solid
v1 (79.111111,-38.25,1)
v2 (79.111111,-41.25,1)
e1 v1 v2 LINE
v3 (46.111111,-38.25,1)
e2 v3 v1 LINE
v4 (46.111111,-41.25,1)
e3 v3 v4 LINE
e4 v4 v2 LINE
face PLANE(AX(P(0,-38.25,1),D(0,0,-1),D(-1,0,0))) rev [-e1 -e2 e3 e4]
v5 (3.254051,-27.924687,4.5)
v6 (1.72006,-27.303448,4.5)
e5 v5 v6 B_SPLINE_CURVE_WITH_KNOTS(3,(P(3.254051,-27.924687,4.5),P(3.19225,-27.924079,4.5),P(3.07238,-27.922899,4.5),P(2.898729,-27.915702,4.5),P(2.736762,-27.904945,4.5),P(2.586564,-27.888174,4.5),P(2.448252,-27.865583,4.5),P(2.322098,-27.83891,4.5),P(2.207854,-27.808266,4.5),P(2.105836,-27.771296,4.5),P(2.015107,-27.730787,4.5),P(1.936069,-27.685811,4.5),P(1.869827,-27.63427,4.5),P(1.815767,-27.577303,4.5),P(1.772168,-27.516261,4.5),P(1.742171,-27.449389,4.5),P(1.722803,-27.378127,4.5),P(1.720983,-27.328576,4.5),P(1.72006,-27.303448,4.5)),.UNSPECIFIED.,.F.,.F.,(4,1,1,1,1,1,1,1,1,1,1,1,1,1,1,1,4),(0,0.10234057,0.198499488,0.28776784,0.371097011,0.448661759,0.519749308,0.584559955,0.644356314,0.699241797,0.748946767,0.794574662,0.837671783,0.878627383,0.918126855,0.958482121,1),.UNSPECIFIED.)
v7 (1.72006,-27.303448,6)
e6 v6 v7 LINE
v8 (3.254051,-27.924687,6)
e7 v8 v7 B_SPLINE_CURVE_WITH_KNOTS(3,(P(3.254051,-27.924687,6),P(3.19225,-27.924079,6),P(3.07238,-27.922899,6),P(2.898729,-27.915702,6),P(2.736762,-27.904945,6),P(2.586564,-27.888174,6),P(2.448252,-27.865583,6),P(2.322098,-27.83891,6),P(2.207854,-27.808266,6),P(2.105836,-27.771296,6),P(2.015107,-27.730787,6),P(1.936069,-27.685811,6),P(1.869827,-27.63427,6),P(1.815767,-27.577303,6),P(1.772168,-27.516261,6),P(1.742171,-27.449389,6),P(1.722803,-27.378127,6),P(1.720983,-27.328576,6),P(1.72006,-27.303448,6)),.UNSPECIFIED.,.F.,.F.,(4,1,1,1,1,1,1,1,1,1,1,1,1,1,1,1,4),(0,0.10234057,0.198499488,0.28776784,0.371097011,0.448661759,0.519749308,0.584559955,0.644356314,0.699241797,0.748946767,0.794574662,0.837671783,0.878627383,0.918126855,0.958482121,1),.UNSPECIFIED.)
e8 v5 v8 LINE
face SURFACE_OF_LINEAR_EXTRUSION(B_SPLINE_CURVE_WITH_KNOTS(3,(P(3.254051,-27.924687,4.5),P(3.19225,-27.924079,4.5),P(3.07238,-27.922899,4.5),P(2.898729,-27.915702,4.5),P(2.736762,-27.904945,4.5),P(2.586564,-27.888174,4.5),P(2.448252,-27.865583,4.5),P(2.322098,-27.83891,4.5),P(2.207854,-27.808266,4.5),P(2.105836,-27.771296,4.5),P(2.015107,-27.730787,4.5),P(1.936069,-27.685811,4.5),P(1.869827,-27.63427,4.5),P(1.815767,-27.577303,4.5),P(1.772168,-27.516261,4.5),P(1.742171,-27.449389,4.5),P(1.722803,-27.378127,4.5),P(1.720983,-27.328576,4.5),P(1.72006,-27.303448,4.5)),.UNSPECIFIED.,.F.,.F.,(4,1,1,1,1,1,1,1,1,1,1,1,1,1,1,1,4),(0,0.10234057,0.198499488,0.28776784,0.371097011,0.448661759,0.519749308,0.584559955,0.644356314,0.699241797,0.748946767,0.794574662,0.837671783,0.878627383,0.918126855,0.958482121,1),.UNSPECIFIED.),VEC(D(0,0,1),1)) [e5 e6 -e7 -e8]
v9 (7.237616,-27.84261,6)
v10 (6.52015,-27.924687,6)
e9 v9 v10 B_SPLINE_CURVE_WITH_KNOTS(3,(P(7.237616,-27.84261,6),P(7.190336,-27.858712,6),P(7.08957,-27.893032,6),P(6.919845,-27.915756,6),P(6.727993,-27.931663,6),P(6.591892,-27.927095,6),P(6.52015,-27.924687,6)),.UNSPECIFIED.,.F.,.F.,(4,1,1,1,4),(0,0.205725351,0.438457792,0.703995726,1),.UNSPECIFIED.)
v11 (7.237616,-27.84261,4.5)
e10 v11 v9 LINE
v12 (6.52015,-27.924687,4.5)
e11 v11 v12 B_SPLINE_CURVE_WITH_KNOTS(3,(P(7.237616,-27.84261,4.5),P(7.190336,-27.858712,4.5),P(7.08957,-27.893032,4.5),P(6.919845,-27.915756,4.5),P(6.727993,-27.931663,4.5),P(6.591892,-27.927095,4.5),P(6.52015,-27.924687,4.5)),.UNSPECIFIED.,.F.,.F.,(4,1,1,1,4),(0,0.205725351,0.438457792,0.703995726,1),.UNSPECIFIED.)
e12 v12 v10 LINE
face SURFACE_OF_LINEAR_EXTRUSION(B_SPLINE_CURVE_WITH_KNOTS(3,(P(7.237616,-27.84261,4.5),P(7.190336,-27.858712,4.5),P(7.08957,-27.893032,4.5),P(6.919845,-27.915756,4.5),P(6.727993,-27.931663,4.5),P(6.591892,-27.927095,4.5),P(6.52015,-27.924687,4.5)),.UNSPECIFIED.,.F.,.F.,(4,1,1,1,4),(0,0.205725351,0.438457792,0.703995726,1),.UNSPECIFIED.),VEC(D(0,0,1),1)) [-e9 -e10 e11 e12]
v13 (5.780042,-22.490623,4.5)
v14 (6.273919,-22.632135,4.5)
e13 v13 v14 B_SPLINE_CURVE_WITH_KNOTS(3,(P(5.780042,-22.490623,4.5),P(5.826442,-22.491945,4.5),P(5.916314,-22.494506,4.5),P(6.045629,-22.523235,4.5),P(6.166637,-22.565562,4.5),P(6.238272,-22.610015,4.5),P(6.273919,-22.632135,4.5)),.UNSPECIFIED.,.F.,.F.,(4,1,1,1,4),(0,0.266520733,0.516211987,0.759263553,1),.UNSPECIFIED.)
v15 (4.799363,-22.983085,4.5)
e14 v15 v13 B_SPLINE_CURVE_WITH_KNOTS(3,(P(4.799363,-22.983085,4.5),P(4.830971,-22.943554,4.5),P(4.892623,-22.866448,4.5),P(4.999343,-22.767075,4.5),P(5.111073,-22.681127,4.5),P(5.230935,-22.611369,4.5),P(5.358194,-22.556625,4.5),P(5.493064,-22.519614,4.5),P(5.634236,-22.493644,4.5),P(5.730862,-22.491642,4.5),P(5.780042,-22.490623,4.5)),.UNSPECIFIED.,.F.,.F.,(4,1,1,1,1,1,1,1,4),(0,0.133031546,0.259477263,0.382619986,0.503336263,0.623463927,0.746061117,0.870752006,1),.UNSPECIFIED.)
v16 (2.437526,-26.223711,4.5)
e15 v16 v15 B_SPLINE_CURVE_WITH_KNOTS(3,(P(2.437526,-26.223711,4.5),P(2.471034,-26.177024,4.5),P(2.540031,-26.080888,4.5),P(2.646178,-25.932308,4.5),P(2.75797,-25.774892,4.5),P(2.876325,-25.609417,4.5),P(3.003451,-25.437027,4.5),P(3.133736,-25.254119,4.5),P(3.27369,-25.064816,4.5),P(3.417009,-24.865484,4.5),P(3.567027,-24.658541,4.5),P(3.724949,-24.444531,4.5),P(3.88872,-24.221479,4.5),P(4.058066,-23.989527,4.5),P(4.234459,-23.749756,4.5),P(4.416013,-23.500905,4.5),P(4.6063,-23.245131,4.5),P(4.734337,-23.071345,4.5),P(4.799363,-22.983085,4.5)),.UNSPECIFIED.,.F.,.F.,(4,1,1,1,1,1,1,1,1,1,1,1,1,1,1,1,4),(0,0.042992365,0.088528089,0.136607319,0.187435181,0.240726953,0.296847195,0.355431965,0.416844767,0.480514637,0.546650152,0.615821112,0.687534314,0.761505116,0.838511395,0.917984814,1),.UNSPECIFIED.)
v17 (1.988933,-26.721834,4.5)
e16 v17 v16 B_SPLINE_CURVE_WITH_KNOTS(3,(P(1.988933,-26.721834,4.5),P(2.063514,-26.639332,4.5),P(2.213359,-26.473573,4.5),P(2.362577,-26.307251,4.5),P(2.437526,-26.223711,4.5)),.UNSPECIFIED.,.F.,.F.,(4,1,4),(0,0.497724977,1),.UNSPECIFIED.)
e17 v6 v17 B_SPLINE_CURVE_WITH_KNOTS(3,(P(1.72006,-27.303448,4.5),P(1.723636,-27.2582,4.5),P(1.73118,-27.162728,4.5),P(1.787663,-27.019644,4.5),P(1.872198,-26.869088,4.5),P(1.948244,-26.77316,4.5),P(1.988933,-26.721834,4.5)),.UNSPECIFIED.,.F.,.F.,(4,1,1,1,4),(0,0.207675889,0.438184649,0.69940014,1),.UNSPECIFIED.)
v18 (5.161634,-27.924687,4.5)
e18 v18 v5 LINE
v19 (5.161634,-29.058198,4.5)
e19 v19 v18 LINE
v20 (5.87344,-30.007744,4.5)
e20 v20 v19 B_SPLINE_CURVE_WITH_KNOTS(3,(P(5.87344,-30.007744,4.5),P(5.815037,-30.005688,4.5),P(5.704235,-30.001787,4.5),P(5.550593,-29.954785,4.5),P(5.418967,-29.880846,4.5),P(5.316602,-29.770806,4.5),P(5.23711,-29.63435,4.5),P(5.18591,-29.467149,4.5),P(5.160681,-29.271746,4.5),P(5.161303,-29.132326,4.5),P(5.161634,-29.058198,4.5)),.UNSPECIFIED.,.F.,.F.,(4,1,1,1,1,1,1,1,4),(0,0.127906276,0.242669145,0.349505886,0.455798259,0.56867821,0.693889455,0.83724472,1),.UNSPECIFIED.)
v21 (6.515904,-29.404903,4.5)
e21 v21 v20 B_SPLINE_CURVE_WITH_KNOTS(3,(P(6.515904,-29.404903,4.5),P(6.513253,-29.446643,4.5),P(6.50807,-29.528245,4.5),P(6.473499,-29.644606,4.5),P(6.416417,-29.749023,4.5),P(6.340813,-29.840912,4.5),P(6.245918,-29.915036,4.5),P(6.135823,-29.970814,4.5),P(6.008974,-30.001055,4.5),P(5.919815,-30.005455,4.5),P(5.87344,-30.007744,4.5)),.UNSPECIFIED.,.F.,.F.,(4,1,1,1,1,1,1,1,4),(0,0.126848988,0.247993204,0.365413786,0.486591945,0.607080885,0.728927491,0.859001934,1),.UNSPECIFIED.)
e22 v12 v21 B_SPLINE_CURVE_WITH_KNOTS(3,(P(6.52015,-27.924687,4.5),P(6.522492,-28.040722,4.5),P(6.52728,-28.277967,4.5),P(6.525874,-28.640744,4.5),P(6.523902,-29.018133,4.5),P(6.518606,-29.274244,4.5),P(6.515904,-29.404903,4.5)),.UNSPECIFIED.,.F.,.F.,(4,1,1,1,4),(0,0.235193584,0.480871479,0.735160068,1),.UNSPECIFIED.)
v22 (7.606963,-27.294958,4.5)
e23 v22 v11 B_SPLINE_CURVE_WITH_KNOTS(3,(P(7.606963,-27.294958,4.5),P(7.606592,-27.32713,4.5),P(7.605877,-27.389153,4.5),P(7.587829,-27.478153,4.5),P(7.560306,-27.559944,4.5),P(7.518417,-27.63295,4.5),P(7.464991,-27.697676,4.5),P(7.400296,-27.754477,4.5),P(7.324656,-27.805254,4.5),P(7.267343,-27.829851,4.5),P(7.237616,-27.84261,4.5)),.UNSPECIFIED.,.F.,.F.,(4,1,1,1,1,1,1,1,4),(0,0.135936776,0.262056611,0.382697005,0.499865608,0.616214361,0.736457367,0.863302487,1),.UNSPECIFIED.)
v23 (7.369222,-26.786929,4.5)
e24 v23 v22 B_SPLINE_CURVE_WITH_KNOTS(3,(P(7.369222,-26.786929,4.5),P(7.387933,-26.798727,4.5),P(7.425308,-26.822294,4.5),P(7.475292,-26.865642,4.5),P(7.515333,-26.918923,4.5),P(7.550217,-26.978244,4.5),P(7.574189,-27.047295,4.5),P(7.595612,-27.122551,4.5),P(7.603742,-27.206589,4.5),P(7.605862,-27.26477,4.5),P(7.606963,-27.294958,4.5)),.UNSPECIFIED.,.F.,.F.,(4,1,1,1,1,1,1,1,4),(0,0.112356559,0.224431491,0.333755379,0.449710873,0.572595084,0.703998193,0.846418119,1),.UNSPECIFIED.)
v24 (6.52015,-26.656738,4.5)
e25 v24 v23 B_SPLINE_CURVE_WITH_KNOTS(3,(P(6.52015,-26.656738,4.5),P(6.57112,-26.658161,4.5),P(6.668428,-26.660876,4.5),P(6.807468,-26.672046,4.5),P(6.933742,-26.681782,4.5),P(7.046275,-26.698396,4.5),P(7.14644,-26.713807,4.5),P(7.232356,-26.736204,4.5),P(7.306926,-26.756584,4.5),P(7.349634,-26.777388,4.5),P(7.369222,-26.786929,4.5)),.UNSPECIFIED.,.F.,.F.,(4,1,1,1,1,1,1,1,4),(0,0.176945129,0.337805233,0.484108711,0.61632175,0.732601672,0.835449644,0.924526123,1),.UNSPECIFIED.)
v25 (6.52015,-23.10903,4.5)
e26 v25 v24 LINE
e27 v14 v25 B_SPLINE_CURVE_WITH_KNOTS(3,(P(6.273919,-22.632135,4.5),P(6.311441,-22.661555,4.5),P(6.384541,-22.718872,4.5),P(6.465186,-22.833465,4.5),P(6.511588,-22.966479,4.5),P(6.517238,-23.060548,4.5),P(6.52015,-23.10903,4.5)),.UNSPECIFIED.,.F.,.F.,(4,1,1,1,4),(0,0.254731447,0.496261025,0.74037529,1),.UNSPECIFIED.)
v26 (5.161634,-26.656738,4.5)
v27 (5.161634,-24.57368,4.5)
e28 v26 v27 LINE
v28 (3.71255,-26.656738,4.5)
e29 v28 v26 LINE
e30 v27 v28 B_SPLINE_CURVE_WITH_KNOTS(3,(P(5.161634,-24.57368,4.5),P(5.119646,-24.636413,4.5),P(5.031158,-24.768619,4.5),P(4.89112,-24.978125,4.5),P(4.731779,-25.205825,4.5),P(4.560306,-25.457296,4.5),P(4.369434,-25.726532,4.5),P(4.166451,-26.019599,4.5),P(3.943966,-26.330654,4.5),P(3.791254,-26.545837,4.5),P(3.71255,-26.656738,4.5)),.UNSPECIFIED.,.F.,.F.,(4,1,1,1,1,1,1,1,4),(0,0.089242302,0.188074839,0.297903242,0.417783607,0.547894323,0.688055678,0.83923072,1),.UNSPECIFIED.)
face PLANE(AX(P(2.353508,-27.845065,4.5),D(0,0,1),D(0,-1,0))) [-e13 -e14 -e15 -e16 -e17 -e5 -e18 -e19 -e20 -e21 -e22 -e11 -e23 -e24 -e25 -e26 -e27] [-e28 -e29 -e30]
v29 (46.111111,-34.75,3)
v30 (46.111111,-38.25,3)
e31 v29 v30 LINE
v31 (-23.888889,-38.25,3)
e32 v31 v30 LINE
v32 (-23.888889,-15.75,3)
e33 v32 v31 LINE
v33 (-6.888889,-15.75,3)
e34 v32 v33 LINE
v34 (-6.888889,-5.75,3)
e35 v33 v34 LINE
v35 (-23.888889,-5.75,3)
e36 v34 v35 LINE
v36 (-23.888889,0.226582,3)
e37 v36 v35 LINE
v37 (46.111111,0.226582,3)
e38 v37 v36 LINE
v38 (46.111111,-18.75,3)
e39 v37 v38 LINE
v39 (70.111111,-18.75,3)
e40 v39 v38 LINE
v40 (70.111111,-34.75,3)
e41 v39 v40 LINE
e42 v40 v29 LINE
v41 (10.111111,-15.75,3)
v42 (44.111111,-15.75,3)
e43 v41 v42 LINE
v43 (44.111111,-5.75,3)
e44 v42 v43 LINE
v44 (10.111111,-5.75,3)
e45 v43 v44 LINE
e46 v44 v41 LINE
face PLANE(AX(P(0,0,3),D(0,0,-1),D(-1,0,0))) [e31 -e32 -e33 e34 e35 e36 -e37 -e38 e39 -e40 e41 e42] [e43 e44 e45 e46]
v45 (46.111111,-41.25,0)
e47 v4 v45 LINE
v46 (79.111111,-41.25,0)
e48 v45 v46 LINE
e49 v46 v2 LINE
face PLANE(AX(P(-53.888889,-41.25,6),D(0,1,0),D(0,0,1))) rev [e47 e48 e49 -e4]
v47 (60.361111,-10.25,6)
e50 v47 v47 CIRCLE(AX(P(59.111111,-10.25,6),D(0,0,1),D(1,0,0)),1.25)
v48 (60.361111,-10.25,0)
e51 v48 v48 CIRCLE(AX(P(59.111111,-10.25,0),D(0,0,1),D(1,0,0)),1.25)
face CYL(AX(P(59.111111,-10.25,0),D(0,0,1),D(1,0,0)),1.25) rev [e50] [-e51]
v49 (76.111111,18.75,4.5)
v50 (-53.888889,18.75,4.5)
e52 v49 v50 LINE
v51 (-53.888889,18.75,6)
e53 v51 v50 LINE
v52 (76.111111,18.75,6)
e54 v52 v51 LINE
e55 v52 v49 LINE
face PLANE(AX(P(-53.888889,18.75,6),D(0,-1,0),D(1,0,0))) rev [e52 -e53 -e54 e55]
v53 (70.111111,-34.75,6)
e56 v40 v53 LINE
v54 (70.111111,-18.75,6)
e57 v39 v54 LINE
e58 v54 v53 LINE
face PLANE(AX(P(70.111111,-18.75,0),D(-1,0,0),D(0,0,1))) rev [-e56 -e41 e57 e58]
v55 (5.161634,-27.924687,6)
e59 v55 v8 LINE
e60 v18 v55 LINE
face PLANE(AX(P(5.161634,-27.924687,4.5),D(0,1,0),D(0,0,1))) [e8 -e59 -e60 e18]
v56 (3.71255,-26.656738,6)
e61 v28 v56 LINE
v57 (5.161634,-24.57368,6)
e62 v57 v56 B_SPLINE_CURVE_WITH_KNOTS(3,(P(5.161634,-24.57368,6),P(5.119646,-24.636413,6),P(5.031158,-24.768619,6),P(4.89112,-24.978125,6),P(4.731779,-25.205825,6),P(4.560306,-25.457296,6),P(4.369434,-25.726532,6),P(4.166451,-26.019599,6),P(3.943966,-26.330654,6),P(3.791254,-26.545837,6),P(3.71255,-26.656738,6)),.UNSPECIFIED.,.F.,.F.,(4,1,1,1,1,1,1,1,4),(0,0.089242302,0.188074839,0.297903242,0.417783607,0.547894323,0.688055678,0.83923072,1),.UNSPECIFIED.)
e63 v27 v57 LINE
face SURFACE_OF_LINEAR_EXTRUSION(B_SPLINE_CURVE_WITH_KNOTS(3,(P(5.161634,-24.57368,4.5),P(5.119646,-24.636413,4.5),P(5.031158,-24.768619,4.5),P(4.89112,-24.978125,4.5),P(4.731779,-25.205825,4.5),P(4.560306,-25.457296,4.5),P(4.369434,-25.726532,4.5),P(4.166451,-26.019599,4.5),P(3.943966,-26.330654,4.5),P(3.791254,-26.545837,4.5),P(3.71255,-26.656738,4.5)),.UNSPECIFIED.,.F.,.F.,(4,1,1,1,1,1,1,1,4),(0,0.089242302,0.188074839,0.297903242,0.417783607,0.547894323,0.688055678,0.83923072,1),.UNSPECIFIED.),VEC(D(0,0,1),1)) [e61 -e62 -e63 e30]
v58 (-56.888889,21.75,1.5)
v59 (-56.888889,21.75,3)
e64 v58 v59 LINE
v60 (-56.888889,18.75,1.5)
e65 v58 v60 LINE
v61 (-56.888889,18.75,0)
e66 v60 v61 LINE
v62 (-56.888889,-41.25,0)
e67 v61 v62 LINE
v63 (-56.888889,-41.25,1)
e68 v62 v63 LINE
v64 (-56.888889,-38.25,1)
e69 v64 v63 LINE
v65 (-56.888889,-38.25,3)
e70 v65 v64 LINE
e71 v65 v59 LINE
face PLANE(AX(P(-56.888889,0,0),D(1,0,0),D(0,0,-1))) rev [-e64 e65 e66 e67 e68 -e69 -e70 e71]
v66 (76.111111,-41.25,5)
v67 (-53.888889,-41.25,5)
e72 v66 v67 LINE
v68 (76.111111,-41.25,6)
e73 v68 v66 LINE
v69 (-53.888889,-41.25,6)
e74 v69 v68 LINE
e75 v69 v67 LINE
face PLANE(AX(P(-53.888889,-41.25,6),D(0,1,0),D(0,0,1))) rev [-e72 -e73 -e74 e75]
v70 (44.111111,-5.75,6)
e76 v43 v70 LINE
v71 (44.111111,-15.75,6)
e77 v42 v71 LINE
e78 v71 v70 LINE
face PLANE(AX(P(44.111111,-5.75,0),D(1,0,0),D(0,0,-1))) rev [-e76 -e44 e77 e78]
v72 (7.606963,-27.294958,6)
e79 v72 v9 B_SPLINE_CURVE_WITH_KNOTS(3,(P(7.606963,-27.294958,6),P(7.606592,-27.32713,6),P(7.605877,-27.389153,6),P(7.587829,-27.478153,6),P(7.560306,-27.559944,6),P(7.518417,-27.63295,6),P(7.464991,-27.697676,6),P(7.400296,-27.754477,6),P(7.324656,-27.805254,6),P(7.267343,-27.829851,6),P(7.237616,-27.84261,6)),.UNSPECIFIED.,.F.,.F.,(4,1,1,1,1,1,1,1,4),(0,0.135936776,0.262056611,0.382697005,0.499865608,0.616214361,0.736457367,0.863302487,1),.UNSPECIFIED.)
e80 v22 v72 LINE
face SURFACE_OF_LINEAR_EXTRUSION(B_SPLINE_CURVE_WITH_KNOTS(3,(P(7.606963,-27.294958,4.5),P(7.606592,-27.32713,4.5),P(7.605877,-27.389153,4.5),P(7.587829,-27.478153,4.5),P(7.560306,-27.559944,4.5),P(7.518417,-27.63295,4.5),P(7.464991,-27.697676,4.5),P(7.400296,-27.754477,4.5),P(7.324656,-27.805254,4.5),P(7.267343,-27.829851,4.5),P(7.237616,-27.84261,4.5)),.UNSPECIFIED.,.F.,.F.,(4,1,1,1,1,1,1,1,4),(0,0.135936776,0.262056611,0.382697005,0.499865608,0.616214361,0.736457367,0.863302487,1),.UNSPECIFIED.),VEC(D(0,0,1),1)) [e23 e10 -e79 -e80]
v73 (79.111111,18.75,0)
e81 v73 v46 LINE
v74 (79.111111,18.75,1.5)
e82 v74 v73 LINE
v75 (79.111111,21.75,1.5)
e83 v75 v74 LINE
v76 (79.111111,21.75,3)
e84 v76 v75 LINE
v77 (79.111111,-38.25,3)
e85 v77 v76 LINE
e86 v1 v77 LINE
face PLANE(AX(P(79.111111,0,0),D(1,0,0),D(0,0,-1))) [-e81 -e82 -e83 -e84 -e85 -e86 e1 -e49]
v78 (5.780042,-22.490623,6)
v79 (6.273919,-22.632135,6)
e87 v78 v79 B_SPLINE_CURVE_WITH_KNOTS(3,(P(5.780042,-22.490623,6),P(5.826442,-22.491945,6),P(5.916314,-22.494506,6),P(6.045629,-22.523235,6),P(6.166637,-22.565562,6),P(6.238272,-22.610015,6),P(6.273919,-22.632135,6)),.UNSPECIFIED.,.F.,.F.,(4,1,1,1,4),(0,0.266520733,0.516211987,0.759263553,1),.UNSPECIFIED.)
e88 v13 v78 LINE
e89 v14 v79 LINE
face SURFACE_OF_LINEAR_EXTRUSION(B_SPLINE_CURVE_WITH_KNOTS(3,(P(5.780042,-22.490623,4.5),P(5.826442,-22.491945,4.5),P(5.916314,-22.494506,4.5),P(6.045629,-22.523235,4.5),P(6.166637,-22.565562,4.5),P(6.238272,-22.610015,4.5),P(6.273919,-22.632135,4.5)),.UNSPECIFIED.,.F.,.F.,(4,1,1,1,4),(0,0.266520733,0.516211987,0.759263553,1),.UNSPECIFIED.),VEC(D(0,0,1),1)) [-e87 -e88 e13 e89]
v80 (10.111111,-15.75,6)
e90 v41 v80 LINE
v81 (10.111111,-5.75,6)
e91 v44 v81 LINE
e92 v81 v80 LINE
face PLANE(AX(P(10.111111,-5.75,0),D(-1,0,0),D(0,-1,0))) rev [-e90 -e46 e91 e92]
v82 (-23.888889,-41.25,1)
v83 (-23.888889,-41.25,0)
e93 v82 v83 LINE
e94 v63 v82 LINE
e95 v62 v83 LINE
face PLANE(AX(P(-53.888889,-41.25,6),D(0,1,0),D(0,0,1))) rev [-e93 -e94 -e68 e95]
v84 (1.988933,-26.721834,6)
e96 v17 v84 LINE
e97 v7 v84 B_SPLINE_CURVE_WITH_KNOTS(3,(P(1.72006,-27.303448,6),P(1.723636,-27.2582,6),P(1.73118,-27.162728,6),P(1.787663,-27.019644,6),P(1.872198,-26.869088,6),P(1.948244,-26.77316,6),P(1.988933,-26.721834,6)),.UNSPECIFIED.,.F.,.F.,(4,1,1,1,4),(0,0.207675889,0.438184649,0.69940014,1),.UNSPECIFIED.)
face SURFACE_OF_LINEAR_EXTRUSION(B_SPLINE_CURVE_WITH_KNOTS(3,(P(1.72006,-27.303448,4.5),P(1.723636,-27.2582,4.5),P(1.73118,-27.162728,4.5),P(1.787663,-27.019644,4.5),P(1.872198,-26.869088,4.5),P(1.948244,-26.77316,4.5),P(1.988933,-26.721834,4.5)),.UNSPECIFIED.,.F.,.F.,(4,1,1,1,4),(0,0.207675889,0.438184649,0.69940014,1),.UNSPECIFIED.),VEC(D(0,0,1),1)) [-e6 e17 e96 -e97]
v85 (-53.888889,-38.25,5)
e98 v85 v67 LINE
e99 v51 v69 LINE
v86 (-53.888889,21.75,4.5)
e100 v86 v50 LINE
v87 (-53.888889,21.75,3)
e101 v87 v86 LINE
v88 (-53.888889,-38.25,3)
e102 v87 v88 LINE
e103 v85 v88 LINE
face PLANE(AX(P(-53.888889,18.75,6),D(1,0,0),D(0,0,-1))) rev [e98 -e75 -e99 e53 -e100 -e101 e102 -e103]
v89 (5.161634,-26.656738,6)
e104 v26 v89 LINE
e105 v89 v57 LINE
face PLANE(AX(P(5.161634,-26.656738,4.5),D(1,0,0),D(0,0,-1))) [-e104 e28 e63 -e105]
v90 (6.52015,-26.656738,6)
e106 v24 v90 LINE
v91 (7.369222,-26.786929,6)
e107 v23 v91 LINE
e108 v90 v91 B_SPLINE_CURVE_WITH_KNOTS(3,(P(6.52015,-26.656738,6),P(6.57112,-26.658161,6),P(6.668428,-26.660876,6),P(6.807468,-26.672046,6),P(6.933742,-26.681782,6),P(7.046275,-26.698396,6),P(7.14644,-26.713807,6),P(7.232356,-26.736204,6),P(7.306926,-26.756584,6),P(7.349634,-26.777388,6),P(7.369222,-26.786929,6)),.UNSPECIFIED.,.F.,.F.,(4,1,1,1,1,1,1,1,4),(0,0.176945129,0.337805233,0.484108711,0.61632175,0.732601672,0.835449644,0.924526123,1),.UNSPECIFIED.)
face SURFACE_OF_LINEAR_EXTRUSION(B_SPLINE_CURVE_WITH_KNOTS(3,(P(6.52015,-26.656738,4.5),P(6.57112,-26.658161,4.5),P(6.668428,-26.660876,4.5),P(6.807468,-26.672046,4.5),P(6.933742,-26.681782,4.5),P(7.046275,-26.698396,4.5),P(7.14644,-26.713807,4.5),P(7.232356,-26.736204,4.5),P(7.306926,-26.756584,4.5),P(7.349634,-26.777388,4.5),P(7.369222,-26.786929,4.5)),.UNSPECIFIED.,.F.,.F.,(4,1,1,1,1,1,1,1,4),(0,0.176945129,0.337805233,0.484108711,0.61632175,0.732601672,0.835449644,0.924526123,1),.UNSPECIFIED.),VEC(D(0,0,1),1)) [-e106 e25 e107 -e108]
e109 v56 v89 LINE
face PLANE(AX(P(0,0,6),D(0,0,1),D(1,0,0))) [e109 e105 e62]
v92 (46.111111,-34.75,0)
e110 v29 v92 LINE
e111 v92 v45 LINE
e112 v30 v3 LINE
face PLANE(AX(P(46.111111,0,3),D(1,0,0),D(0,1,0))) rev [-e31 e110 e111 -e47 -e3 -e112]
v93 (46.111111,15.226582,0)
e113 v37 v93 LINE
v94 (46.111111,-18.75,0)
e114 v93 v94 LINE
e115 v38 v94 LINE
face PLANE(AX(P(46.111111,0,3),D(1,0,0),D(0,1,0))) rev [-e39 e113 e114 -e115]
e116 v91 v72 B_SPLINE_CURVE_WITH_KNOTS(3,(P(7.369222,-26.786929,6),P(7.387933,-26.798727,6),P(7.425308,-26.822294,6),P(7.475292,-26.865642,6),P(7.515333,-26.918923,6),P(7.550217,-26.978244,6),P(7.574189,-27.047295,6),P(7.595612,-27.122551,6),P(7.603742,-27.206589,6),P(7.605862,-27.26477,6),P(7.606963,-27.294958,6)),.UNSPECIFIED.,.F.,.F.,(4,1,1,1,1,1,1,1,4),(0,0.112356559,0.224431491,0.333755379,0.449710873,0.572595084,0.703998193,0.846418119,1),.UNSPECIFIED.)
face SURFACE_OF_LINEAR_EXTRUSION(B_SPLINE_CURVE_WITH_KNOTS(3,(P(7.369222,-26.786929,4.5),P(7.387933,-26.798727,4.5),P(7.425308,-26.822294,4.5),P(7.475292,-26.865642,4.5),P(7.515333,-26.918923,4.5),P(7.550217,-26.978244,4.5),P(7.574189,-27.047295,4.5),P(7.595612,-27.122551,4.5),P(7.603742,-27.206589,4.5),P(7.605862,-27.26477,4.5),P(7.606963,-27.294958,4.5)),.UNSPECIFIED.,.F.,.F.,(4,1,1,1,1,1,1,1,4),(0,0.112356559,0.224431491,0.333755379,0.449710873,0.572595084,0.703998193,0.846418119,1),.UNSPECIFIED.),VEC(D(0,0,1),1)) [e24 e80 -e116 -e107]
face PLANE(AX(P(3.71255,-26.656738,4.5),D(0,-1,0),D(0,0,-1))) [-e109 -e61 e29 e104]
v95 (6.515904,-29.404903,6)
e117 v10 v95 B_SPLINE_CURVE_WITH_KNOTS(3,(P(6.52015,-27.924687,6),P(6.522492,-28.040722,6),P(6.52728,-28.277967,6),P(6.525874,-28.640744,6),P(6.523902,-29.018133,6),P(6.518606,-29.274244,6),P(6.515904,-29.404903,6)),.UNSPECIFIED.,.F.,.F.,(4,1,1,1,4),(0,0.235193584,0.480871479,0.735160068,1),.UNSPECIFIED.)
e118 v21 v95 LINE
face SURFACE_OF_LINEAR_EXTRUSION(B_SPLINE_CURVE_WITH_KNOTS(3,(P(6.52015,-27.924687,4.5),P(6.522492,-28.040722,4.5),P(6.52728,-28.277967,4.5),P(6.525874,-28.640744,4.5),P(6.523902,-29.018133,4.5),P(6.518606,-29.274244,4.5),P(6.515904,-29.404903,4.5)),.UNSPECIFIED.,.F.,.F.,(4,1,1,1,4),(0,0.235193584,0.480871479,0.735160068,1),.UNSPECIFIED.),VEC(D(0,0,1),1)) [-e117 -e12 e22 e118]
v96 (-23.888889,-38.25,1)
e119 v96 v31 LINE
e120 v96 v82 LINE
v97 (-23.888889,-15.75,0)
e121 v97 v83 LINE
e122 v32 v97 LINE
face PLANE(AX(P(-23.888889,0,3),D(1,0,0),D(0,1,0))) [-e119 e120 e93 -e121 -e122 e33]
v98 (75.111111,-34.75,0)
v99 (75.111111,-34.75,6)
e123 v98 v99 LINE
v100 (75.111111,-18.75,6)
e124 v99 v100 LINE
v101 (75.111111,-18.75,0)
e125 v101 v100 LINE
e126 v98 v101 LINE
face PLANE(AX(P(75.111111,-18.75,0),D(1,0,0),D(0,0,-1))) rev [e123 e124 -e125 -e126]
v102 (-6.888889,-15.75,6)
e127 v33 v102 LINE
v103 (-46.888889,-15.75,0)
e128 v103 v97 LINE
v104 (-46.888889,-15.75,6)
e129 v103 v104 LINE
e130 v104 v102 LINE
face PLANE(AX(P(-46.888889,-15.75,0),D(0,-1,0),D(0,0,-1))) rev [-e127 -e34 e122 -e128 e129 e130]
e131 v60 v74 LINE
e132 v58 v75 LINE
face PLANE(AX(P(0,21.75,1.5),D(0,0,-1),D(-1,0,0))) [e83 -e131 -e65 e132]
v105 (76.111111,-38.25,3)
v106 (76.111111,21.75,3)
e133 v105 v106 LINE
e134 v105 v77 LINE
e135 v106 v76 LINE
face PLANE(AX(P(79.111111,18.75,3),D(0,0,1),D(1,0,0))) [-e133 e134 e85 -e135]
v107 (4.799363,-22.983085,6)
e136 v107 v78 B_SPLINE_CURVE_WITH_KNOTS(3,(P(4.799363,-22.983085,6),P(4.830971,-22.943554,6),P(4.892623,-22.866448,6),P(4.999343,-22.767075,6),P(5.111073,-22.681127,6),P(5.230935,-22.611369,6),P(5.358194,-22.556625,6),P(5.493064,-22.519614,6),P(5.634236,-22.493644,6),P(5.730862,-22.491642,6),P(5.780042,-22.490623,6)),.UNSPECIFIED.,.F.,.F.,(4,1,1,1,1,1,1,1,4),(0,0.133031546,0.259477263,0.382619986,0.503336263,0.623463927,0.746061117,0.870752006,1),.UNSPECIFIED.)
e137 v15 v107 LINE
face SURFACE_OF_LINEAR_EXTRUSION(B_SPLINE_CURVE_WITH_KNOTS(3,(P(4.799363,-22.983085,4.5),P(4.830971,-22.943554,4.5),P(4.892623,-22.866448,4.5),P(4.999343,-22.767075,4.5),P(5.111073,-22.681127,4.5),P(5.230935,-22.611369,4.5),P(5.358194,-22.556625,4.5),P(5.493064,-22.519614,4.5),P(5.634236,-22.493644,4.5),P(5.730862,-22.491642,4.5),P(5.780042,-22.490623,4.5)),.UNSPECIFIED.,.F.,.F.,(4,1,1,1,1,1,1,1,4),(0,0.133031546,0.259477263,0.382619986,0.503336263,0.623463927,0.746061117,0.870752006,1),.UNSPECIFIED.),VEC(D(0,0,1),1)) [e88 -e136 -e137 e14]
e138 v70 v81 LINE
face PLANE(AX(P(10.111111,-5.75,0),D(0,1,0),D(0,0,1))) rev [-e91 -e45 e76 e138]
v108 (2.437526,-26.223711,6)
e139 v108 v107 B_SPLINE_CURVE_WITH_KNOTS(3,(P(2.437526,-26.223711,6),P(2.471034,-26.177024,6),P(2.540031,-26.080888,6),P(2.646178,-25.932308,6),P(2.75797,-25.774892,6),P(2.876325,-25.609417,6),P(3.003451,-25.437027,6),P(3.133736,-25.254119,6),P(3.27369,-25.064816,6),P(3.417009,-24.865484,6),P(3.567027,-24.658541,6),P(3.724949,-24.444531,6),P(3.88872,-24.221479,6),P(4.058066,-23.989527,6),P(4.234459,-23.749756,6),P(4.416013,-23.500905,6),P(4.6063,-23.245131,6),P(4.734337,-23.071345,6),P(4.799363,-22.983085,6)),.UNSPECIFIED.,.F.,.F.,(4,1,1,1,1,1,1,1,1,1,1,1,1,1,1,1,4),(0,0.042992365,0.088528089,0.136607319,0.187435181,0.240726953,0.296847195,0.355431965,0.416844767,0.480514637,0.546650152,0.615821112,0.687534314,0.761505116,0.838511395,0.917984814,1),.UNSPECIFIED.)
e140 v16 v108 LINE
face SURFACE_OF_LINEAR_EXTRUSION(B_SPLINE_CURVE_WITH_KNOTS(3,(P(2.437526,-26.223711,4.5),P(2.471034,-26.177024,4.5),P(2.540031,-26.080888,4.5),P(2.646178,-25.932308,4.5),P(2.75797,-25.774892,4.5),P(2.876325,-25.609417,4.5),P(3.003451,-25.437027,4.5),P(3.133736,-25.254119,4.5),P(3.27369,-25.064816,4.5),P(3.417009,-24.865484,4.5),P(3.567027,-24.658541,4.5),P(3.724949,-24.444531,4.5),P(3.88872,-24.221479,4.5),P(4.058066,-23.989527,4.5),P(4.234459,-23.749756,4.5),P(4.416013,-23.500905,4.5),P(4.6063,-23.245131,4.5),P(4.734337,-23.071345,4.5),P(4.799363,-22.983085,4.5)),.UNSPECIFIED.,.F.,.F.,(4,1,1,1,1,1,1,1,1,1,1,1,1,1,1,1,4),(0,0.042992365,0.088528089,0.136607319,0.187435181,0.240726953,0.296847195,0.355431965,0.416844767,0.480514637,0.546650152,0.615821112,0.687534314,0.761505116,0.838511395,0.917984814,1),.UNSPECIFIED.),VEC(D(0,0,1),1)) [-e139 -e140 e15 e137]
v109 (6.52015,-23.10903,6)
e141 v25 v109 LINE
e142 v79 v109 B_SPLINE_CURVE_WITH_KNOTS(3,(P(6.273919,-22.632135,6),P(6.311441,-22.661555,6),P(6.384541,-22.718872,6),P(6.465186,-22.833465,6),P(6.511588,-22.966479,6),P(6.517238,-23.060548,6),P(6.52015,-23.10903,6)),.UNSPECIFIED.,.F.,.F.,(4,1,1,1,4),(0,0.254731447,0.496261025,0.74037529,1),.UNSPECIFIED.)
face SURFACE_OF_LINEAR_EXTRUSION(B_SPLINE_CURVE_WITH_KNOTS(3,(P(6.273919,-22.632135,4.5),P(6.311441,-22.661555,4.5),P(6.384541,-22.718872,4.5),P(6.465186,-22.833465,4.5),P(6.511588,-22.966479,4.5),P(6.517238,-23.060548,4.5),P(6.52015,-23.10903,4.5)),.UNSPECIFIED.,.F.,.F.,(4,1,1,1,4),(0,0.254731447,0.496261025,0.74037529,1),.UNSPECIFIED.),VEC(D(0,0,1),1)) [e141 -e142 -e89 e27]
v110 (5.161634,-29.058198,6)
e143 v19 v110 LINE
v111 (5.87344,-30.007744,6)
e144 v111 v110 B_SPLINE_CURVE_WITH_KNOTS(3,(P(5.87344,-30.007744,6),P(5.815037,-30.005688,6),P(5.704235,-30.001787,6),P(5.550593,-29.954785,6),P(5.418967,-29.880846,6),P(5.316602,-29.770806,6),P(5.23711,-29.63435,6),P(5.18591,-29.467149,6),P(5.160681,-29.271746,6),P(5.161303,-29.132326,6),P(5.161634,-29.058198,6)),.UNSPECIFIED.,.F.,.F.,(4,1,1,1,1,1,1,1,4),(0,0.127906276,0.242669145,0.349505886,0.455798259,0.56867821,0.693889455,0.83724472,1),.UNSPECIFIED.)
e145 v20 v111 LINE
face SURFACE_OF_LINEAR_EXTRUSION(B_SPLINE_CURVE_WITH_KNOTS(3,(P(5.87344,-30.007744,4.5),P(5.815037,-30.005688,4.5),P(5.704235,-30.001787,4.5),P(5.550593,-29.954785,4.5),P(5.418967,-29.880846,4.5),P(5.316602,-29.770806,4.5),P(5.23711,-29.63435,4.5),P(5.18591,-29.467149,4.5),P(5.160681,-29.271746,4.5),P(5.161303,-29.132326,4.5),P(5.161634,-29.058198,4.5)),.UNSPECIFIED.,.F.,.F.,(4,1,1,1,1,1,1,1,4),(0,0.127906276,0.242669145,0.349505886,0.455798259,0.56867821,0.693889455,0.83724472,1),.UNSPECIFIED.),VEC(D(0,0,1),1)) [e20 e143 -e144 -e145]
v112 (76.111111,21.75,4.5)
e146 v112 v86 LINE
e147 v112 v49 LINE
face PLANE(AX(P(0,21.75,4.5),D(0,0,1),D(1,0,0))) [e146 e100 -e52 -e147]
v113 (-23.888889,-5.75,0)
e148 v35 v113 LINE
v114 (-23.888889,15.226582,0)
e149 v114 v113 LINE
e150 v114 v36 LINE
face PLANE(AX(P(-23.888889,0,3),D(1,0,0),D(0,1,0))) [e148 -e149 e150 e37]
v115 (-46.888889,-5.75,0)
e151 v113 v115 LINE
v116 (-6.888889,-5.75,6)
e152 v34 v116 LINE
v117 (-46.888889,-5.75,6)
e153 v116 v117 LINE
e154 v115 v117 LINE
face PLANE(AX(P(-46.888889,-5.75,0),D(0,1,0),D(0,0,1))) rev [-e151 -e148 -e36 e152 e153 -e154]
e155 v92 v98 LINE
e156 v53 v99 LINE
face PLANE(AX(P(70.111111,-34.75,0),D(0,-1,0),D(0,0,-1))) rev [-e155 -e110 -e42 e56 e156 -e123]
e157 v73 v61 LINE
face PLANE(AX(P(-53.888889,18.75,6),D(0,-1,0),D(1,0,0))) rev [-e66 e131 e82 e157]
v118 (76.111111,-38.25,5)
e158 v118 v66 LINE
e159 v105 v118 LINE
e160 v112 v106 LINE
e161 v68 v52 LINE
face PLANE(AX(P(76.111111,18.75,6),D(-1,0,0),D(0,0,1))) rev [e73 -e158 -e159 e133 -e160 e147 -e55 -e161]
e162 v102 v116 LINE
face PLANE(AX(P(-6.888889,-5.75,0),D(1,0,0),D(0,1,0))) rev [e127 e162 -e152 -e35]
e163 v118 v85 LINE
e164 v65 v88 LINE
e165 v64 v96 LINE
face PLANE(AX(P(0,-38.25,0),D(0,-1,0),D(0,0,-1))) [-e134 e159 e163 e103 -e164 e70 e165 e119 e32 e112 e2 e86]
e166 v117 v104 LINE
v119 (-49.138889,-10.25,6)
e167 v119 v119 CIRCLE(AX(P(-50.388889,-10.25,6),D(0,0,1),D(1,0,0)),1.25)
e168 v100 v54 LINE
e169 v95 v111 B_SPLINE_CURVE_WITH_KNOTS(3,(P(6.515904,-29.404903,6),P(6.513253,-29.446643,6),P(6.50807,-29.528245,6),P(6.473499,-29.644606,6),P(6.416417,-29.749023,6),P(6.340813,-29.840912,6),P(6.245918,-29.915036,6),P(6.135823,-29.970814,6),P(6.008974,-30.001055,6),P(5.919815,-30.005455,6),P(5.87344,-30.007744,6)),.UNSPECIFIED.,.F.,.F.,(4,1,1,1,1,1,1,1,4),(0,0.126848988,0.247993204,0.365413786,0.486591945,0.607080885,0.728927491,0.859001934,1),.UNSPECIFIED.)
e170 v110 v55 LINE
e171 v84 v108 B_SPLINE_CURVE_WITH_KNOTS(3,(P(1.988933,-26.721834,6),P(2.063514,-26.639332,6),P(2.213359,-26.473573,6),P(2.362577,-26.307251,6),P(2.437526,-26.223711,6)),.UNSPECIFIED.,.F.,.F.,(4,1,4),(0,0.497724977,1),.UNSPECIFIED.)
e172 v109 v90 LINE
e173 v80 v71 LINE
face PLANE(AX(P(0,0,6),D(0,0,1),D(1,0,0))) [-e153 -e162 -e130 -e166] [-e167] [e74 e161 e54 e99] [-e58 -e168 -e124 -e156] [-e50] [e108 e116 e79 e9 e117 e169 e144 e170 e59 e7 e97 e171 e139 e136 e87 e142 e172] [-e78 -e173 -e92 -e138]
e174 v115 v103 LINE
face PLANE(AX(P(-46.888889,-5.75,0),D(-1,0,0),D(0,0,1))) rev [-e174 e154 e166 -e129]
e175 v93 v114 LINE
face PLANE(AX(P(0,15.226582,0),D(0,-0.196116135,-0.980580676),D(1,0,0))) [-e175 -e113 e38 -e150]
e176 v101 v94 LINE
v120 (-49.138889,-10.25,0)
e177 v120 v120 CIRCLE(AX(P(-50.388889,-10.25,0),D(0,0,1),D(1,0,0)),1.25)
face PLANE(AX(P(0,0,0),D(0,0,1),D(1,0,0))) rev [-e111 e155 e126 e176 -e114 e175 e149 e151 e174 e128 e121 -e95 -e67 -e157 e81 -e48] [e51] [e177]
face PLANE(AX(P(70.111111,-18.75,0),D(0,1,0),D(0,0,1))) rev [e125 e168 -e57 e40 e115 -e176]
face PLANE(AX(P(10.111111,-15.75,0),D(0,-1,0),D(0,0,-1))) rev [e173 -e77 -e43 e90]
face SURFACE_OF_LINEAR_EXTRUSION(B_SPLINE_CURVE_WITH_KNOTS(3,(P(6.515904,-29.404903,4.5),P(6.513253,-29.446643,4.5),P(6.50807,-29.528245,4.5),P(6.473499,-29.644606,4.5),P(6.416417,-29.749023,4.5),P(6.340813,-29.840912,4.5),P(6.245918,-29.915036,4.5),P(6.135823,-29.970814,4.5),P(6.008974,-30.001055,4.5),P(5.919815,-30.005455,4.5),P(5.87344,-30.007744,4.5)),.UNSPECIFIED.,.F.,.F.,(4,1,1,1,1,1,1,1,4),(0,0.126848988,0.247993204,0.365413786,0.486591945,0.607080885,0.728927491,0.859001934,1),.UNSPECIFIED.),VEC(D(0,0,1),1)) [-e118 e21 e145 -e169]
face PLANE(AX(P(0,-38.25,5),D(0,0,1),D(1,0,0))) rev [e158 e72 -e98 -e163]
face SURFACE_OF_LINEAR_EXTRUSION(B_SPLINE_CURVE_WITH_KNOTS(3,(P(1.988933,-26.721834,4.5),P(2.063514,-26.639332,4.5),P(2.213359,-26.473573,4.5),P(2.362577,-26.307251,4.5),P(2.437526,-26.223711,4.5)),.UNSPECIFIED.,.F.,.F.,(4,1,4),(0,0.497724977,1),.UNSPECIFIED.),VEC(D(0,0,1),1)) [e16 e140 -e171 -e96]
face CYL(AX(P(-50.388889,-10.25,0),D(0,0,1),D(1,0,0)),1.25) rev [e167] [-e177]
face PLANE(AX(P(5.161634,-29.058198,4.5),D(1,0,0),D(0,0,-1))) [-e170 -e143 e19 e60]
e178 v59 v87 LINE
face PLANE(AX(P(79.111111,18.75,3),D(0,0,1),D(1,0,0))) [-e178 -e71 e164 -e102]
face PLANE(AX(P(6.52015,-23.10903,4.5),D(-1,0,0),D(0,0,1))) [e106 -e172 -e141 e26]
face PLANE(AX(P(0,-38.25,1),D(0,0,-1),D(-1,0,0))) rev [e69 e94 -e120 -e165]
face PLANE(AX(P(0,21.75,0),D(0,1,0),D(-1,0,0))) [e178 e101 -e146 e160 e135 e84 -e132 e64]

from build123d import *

# Parameters (mm, degrees)
SKETCH_1_W           = 130
SKETCH_1_H           = 60
EXTRUDE_1_DEPTH      = 6
EXTRUDE_2_DEPTH      = 3
EXTRUDE_2_DEPTH_BACK = 133
SKETCH_2_W           = 3
SKETCH_2_H           = 60
SKETCH_3_R           = 1.25
SKETCH_3_W           = 5
SKETCH_3_H           = 16
SKETCH_3_W_2         = 40
SKETCH_3_H_2         = 10
SKETCH_3_W_3         = 34
CUT_EXTRUDE_1_DEPTH  = 6
CUT_EXTRUDE_2_DEPTH  = 1.5
SKETCH_5_W           = 70
SKETCH_5_H           = 41.476582403
SKETCH_5_W_2         = 24
SKETCH_5_H_2         = 16
CUT_EXTRUDE_3_DEPTH  = 3
CHAMFER_1_SIZE       = 15
CHAMFER_1_SIZE_2     = 3
CUT_EXTRUDE_4_DEPTH  = 3
SKETCH_7_W           = 130
SKETCH_7_H           = 1.5
EXTRUDE_3_DEPTH      = 3


with BuildPart() as part:
    # 草圖1 → 填料-伸長1 (new body)
    with BuildSketch(Plane.XY):
        with Locations((11.111111111, -11.25)):
            Rectangle(SKETCH_1_W, SKETCH_1_H)
    extrude(amount=EXTRUDE_1_DEPTH)

    # 草圖2 → 填料-伸長2 (add, two sides: drawn at the far end of the back side and taken through both)
    with BuildSketch(Plane.ZY.offset(53.888888889).offset(-EXTRUDE_2_DEPTH_BACK)):
        with Locations((1.5, -11.25)):
            Rectangle(SKETCH_2_W, SKETCH_2_H)
    extrude(amount=EXTRUDE_2_DEPTH + EXTRUDE_2_DEPTH_BACK)

    # 草圖3 → 除料-伸長1 (cut)
    with BuildSketch(Plane.XY.offset(6)):
        with Locations((59.111111111, -10.25)):
            Circle(SKETCH_3_R)
        with Locations((-50.388888889, -10.25)):
            Circle(SKETCH_3_R)
        with Locations((72.611111111, -26.75)):
            Rectangle(SKETCH_3_W, SKETCH_3_H)
        with Locations((-26.888888889, -10.75)):
            Rectangle(SKETCH_3_W_2, SKETCH_3_H_2)
        with Locations((27.111111111, -10.75)):
            Rectangle(SKETCH_3_W_3, SKETCH_3_H_2)
    extrude(amount=-CUT_EXTRUDE_1_DEPTH, mode=Mode.SUBTRACT)

    # 草圖4 → 除料-伸長2 (cut)
    with BuildSketch(Plane.XY.offset(6)):
        with BuildLine():
            Line((5.161633763, -27.924686511), (3.254050898, -27.924686511))
            add(Edge.make_bspline(
                [(3.254050898, -27.924686511), (3.192249579, -27.924078509), (3.072379909, -27.922899232), (2.898729115, -27.915701709), (2.736761533, -27.904944526), (2.586564336, -27.888174414), (2.448251756, -27.865582926), (2.322097886, -27.838909636), (2.207853822, -27.808266207), (2.105836262, -27.771295953), (2.01510686, -27.730787239), (1.936069122, -27.68581143), (1.86982721, -27.634270004), (1.815766676, -27.57730265), (1.772168095, -27.516260775), (1.742170993, -27.449388735), (1.72280295, -27.378127045), (1.720982885, -27.328575874), (1.72005993, -27.303448471)],
                knots=[0, 0, 0, 0, 1.637449122, 3.175991815, 4.604285445, 5.937552174, 7.178588142, 8.315988927, 9.352959284, 10.309701018, 11.187868748, 11.983148269, 12.713194599, 13.402748524, 14.058038132, 14.690029686, 15.335713943, 16, 16, 16, 16], degree=3))
            add(Edge.make_bspline(
                [(1.72005993, -27.303448471), (1.723635689, -27.258199951), (1.731180344, -27.162728075), (1.787663263, -27.019644469), (1.87219849, -26.869087652), (1.94824443, -26.77316), (1.988932886, -26.721833814)],
                knots=[0, 0, 0, 0, 0.830703556, 1.752738595, 2.797600559, 4, 4, 4, 4], degree=3))
            add(Edge.make_bspline(
                [(1.988932886, -26.721833814), (2.063514276, -26.639331654), (2.213358857, -26.473573125), (2.362577426, -26.307250824), (2.437526185, -26.223711286)],
                knots=[0, 0, 0, 0, 0.995449954, 2, 2, 2, 2], degree=3))
            add(Edge.make_bspline(
                [(2.437526185, -26.223711286), (2.47103383, -26.177024109), (2.540031377, -26.080887817), (2.64617827, -25.932308493), (2.757969515, -25.7748922), (2.87632458, -25.60941735), (3.003450981, -25.437027126), (3.133736422, -25.254119028), (3.273689868, -25.064815864), (3.417008587, -24.865483968), (3.567026655, -24.658540826), (3.724948502, -24.444530992), (3.888719581, -24.221478696), (4.058065694, -23.989527198), (4.234458829, -23.749756028), (4.416012984, -23.500904526), (4.606300307, -23.245131026), (4.734336909, -23.071345188), (4.799362833, -22.983084609)],
                knots=[0, 0, 0, 0, 0.68787784, 1.416449417, 2.185717103, 2.998962895, 3.851631247, 4.749555124, 5.686911444, 6.669516273, 7.688234189, 8.746402434, 9.853137794, 11.000549032, 12.184081851, 13.416182313, 14.687757029, 16, 16, 16, 16], degree=3))
            add(Edge.make_bspline(
                [(4.799362833, -22.983084609), (4.830971294, -22.943553506), (4.892623413, -22.866448317), (4.999342936, -22.767074964), (5.111072502, -22.681126787), (5.230934533, -22.611368569), (5.358194037, -22.556625494), (5.493063713, -22.519613637), (5.634235505, -22.493643771), (5.730861536, -22.49164161), (5.780041561, -22.490622564)],
                knots=[0, 0, 0, 0, 1.06425237, 2.0758181, 3.06095989, 4.026690108, 4.987711416, 5.968488933, 6.966016048, 8, 8, 8, 8], degree=3))
            add(Edge.make_bspline(
                [(5.780041561, -22.490622564), (5.826442291, -22.491944732), (5.916313772, -22.494505581), (6.045628911, -22.523235489), (6.166636791, -22.565562498), (6.23827235, -22.610014837), (6.273918727, -22.632134646)],
                knots=[0, 0, 0, 0, 1.066082933, 2.064847948, 3.037054213, 4, 4, 4, 4], degree=3))
            add(Edge.make_bspline(
                [(6.273918727, -22.632134646), (6.311441096, -22.661555246), (6.384541176, -22.718871676), (6.465186438, -22.833465288), (6.511587665, -22.966478607), (6.517237732, -23.060547629), (6.52014975, -23.109030362)],
                knots=[0, 0, 0, 0, 1.018925786, 1.985044098, 2.961501162, 4, 4, 4, 4], degree=3))
            Line((6.52014975, -23.109030362), (6.52014975, -26.656738256))
            add(Edge.make_bspline(
                [(6.52014975, -26.656738256), (6.571120358, -26.658160603), (6.668428141, -26.660876), (6.807468472, -26.672045587), (6.933741535, -26.681782224), (7.04627481, -26.698396225), (7.146439706, -26.713806583), (7.232355911, -26.736203852), (7.306925886, -26.756584321), (7.349633605, -26.777387591), (7.369222241, -26.786929372)],
                knots=[0, 0, 0, 0, 1.415561033, 2.70244186, 3.872869685, 4.930574004, 5.860813375, 6.683597148, 7.396208987, 8, 8, 8, 8], degree=3))
            add(Edge.make_bspline(
                [(7.369222241, -26.786929372), (7.387933285, -26.798727315), (7.425308471, -26.82229363), (7.475291838, -26.865642335), (7.515332971, -26.918922636), (7.550217281, -26.978243638), (7.574189335, -27.047295447), (7.595611952, -27.122551217), (7.603742149, -27.206589411), (7.605862425, -27.264770318), (7.606962539, -27.294957746)],
                knots=[0, 0, 0, 0, 0.898852474, 1.795451925, 2.670043032, 3.597686986, 4.580760669, 5.631985542, 6.771344949, 8, 8, 8, 8], degree=3))
            add(Edge.make_bspline(
                [(7.606962539, -27.294957746), (7.6065918, -27.327130489), (7.605877096, -27.389152557), (7.587829145, -27.478153146), (7.560306222, -27.5599435), (7.518416649, -27.632950045), (7.464991439, -27.697675729), (7.400296134, -27.754477063), (7.324655873, -27.805253805), (7.267343492, -27.829851085), (7.237616005, -27.842609503)],
                knots=[0, 0, 0, 0, 1.087494211, 2.096452886, 3.061576041, 3.998924861, 4.929714891, 5.891658933, 6.906419893, 8, 8, 8, 8], degree=3))
            add(Edge.make_bspline(
                [(7.237616005, -27.842609503), (7.190336116, -27.858712295), (7.089569557, -27.893031811), (6.919845265, -27.915756431), (6.72799274, -27.93166309), (6.591892116, -27.927094657), (6.52014975, -27.924686511)],
                knots=[0, 0, 0, 0, 0.822901404, 1.753831169, 2.815982903, 4, 4, 4, 4], degree=3))
            add(Edge.make_bspline(
                [(6.52014975, -27.924686511), (6.52249173, -28.040722435), (6.52728009, -28.27796686), (6.525874109, -28.640744347), (6.523902436, -29.018132536), (6.518606285, -29.274244271), (6.515904387, -29.404902888)],
                knots=[0, 0, 0, 0, 0.940774337, 1.923485917, 2.940640271, 4, 4, 4, 4], degree=3))
            add(Edge.make_bspline(
                [(6.515904387, -29.404902888), (6.513253145, -29.446642645), (6.508069894, -29.528245001), (6.47349895, -29.644606371), (6.416416736, -29.749022953), (6.340813008, -29.84091244), (6.245918419, -29.915035809), (6.135823145, -29.970814241), (6.008973806, -30.001054572), (5.919815256, -30.005455315), (5.873439535, -30.007744357)],
                knots=[0, 0, 0, 0, 1.014791907, 1.983945634, 2.923310284, 3.892735559, 4.856647083, 5.831419924, 6.872015472, 8, 8, 8, 8], degree=3))
            add(Edge.make_bspline(
                [(5.873439535, -30.007744357), (5.815037496, -30.005688173), (5.704234702, -30.001787096), (5.550592692, -29.954784505), (5.418967159, -29.880845956), (5.316601579, -29.770806418), (5.237109991, -29.634349624), (5.185909967, -29.467148659), (5.160681119, -29.271746214), (5.161303076, -29.132326216), (5.161633763, -29.058198287)],
                knots=[0, 0, 0, 0, 1.02325021, 1.941353164, 2.796047092, 3.646386069, 4.549425683, 5.551115642, 6.69795776, 8, 8, 8, 8], degree=3))
            Line((5.161633763, -29.058198287), (5.161633763, -27.924686511))
        make_face()
        with BuildLine():
            add(Edge.make_bspline(
                [(5.161633763, -24.57368041), (5.119646014, -24.636412887), (5.031158393, -24.768619255), (4.891120499, -24.978124945), (4.731778952, -25.205824972), (4.560305824, -25.457296058), (4.369434267, -25.726531763), (4.166450797, -26.019598708), (3.9439664, -26.33065406), (3.791254445, -26.545837446), (3.712550044, -26.656738256)],
                knots=[0, 0, 0, 0, 0.713938416, 1.50459871, 2.383225934, 3.342268853, 4.38315458, 5.504445422, 6.71384576, 8, 8, 8, 8], degree=3))
            Line((3.712550044, -26.656738256), (5.161633763, -26.656738256))
            Line((5.161633763, -26.656738256), (5.161633763, -24.57368041))
        make_face(mode=Mode.SUBTRACT)
    extrude(amount=-CUT_EXTRUDE_2_DEPTH, mode=Mode.SUBTRACT)

    # 草圖5 → 除料-伸長3 (cut)
    with BuildSketch(Plane(origin=(0, 0, 0), x_dir=(-1, 0, 0), z_dir=(0, 0, -1))):
        with Locations((-11.111111111, -20.511708798)):
            Rectangle(SKETCH_5_W, SKETCH_5_H)
        with Locations((-58.111111111, -26.75)):
            Rectangle(SKETCH_5_W_2, SKETCH_5_H_2)
    extrude(amount=-CUT_EXTRUDE_3_DEPTH, mode=Mode.SUBTRACT)

    # 導角1
    # the kernel refuses this chamfer: 15, 3 mm, written as the material it takes off along each edge
    with BuildSketch(Plane(origin=(46.111111111, 0.226582403, 0), x_dir=(0, 0.9999715107910818, -0.00754835122404063), z_dir=(-1, 0, 0))) as chamfer_1_piece_1_section:
        Polygon((CHAMFER_1_SIZE * 0.999971510791, -CHAMFER_1_SIZE * 0.00754835122404), (-CHAMFER_1_SIZE_2 * 0.00754835122404, -CHAMFER_1_SIZE_2 * 0.999971510791), (0, 0), align=None)
    chamfer_1_piece_1 = extrude(amount=70, mode=Mode.PRIVATE)
    chamfer_1_piece_1 = split(chamfer_1_piece_1, bisect_by=Plane(origin=(11.111111111, 5.568156657, 3), z_dir=(0, 0, -1)), keep=Keep.TOP, mode=Mode.PRIVATE)
    add(chamfer_1_piece_1, mode=Mode.SUBTRACT)

    # 草圖6 → 除料-伸長4 (cut)
    with BuildSketch(Plane.XZ.offset(41.25)):
        Polygon((-53.888888889, 3), (-23.888888889, 3), (46.111111111, 3), (76.111111111, 3), (76.111111111, 5), (-53.888888889, 5), align=None)
        Polygon((-56.888888889, 3), (-56.888888889, 1), (-23.888888889, 1), (-23.888888889, 3), (-53.888888889, 3), align=None)
        Polygon((46.111111111, 3), (46.111111111, 1), (79.111111111, 1), (79.111111111, 3), (76.111111111, 3), align=None)
    extrude(amount=-CUT_EXTRUDE_4_DEPTH, mode=Mode.SUBTRACT)

    # 草圖7 → 填料-伸長3 (add)
    with BuildSketch(Plane(origin=(0, 18.75, 0), x_dir=(1, 0, 0), z_dir=(0, 1, 0))):
        Polygon((79.111111111, -1.5), (-56.888888889, -1.5), (-56.888888889, -3), (-53.888888889, -3), (76.111111111, -3), (79.111111111, -3), align=None)
        with Locations((11.111111111, -3.75)):
            Rectangle(SKETCH_7_W, SKETCH_7_H)
    extrude(amount=EXTRUDE_3_DEPTH)


solid = part.part
